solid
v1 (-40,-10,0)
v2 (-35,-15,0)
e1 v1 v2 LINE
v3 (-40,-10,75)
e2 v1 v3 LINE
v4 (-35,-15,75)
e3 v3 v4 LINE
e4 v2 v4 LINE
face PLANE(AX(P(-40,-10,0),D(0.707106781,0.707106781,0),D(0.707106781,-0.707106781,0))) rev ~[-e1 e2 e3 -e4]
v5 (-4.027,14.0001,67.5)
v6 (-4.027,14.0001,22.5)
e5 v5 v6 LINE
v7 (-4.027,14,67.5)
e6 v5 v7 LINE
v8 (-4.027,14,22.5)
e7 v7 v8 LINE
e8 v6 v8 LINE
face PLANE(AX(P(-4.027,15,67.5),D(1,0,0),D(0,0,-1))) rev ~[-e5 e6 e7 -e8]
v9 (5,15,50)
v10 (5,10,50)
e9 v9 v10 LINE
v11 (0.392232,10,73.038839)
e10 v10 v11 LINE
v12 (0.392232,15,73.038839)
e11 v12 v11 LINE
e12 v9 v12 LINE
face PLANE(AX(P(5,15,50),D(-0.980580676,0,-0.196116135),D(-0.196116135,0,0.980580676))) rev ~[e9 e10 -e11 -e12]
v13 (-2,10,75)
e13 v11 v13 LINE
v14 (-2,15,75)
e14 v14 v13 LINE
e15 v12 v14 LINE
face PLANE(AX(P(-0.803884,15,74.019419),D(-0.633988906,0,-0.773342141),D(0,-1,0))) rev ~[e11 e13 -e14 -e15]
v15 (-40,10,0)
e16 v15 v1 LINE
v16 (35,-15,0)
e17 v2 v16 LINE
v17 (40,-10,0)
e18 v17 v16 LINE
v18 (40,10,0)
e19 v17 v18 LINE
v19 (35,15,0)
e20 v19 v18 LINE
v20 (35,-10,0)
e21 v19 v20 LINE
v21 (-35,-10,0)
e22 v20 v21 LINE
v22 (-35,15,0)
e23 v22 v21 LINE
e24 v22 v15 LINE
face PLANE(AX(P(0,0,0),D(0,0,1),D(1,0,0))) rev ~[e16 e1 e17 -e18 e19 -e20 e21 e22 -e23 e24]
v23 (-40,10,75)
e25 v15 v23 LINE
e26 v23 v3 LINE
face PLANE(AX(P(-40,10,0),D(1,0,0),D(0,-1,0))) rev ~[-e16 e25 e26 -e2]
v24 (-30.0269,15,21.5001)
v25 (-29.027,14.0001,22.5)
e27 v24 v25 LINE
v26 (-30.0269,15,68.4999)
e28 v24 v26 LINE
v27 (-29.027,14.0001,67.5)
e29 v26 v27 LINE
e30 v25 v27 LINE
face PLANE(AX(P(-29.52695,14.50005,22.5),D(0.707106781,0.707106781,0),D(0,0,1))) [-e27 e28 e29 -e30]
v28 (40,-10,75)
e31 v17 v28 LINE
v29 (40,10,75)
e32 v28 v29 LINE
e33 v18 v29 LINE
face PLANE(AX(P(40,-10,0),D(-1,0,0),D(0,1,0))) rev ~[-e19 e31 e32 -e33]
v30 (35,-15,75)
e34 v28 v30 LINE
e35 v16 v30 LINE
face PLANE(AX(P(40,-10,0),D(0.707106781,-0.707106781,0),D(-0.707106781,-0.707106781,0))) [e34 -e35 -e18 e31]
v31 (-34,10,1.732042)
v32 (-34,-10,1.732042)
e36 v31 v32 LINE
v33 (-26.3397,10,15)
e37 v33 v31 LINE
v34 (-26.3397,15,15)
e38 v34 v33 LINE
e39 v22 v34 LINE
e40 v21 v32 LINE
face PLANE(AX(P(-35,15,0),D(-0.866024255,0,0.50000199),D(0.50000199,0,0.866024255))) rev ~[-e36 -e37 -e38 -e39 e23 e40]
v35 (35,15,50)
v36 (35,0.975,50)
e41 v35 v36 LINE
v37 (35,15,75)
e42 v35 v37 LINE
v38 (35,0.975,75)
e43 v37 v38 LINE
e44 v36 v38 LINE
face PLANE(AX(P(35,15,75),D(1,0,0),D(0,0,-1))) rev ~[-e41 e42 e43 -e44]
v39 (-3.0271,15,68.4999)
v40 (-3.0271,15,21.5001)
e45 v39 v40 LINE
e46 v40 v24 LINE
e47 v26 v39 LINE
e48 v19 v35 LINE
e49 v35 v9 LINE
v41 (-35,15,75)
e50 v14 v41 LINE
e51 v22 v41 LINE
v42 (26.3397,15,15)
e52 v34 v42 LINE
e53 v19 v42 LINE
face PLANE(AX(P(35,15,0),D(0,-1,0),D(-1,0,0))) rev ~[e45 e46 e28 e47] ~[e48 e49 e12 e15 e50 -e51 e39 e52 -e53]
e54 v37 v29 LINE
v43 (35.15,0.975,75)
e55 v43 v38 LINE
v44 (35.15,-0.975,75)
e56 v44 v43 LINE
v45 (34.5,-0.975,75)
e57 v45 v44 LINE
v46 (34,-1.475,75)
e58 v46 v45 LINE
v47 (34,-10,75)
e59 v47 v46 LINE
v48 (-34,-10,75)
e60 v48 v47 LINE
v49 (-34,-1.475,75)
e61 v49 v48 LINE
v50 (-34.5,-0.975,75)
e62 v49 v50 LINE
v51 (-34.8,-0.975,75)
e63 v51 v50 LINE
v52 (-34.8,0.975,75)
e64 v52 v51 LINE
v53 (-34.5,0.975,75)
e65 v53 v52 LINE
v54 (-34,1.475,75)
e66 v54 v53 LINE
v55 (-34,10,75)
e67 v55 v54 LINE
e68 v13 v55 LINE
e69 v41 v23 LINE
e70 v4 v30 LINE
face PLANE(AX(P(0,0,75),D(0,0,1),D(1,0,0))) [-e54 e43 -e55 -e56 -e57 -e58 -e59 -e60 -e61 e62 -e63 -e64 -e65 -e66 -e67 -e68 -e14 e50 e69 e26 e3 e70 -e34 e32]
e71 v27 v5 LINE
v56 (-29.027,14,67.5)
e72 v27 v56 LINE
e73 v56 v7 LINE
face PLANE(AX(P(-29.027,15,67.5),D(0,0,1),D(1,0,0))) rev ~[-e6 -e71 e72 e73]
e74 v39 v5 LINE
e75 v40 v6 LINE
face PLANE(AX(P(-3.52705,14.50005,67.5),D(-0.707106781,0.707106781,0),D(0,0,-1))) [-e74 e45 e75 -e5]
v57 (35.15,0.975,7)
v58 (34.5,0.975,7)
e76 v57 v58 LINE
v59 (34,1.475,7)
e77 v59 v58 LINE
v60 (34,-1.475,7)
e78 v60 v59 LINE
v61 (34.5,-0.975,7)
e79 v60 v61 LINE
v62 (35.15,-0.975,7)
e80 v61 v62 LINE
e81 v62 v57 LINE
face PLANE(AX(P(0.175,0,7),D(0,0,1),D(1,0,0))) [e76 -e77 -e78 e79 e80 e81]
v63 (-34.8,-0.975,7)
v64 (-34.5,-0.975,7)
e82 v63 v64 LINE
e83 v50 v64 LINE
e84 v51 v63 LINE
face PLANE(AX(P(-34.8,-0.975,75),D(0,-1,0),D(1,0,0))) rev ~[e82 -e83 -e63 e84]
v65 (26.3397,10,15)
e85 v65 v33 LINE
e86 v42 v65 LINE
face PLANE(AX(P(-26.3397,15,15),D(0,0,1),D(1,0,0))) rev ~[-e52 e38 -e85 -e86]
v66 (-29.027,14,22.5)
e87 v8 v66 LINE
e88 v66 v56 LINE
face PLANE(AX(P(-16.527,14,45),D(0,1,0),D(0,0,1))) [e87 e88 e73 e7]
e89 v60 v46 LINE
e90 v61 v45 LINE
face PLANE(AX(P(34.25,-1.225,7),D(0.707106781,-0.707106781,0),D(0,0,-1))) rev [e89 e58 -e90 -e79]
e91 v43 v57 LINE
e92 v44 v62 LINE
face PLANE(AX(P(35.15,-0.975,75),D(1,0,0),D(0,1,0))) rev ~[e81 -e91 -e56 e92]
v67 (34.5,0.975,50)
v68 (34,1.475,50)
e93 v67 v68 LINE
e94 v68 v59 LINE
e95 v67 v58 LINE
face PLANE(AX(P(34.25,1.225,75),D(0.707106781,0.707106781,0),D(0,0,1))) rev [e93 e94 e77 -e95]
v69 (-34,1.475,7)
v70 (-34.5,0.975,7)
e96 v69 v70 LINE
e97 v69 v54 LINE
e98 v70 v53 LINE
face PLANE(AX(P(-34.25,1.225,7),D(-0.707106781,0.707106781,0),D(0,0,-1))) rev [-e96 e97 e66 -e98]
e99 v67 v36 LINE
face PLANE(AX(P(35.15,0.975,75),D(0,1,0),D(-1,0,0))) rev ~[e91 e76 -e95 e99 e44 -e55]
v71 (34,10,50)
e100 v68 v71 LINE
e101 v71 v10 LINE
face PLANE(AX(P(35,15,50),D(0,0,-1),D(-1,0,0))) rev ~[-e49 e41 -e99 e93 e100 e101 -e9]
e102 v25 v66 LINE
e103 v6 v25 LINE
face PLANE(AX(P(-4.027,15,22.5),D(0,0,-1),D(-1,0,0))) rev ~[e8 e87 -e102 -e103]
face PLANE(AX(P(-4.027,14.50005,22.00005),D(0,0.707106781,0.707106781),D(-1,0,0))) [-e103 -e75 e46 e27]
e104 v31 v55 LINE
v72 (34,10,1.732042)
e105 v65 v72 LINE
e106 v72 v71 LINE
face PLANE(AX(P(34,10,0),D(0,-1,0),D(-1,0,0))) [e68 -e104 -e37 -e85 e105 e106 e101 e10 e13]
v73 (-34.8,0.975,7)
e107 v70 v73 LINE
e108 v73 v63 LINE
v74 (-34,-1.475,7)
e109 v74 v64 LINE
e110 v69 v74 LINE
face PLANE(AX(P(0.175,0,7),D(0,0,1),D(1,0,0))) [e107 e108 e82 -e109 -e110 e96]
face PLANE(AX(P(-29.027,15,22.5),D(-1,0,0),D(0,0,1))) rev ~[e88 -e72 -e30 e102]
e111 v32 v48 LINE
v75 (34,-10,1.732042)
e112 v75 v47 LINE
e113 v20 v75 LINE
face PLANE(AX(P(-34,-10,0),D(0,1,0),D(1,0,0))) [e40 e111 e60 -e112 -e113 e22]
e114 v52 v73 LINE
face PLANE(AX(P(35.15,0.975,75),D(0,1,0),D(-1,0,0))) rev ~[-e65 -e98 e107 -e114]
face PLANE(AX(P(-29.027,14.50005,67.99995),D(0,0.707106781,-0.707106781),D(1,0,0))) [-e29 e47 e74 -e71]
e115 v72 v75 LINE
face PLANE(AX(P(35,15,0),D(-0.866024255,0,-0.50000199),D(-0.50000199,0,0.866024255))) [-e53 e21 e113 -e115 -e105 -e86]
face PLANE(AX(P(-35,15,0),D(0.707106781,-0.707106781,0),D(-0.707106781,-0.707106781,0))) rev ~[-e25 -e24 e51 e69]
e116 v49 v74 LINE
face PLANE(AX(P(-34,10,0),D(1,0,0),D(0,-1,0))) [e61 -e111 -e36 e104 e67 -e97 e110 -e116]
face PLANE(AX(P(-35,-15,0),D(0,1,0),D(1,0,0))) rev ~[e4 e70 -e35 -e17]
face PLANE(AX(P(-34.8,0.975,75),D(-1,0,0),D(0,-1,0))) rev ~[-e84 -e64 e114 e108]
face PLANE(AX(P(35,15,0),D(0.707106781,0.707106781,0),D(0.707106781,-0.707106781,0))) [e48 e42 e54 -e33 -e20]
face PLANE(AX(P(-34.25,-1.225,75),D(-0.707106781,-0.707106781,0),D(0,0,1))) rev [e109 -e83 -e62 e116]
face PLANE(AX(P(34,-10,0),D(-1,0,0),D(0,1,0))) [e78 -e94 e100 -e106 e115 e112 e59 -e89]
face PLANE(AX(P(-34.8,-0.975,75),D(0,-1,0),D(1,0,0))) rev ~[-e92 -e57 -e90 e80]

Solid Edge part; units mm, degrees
sketch "Sketch1" plane through (0, 0, 0) normal (0, 0, 1) x (1, 0, 0)
  line L0 (-34, -10) -> (34, -10)
  line L1 (34, -10) -> (34, 10)
  line L2 (34, 10) -> (-34, 10)
  line L3 (-34, 10) -> (-34, -10)
  line L4 (-35, -15) -> (35, -15)
  line L5 (40, -10) -> (35, -15)
  line L6 (40, -10) -> (40, 10)
  line L7 (35, 15) -> (40, 10)
  line L8 (35, 15) -> (-35, 15)
  line L9 (-35, 15) -> (-40, 10)
  line L10 (-40, 10) -> (-40, -10)
  line L11 (-40, -10) -> (-35, -15)
extrude "Protrusion1" add sketch "Sketch1" along normal blind 75
sketch "Sketch2" plane through (0, 0, 75) normal (0, 0, 1) x (1, 0, 0)
  line L0 (-34.8, -0.975) -> (35.15, -0.975)
  line L1 (35.15, -0.975) -> (35.15, 0.975)
  line L2 (35.15, 0.975) -> (-34.8, 0.975)
  line L3 (-34.8, 0.975) -> (-34.8, -0.975)
extrude "Wycięcie_1" cut sketch "Sketch2" against normal blind 68
chamfer "Faza_1" distance 0.5 angle 45 4 edges at (-34, -0.975, 41) (-34, 0.975, 41) (34, -0.975, 41) (34, 0.975, 41)
sketch "Sketch3" plane through (0, 15, 32.5) normal (0, 1, 0) x (-1, 0, 0)
  line L0 (-35, 17.5) -> (-5, 17.5)
  line L1 (-35, 42.5) -> (-35, 17.5)
  line L2 (-35, 42.5) -> (0, 42.5)
  line L3 (-5, 17.5) -> (0, 42.5)
extrude "Cutout1" cut sketch "Sketch3" against normal up to next
sketch "Sketch4" plane through (0, 15, 32.5) normal (0, 1, 0) x (-1, 0, 0)
  line L0 (-35, -32.5) -> (35, -32.5)
  line L1 (35, -32.5) -> (26.3397, -17.5)
  line L2 (26.3397, -17.5) -> (-26.3397, -17.5)
  line L3 (-35, -32.5) -> (-26.3397, -17.5)
extrude "Cutout2" cut sketch "Sketch4" against normal up to vertex (25 mm away)
sketch "Sketch5" plane through (0, 15, 32.5) normal (0, 1, 0) x (0, 0, 1)
  line L0 (-10, -29.027) -> (35, -29.027)
  line L1 (35, -29.027) -> (35, -4.027)
  line L2 (35, -4.027) -> (-10, -4.027)
  line L3 (-10, -4.027) -> (-10, -29.027)
  dimension "D1" = 7.5
  dimension "D2" = 7.5
extrude "Wycięcie_4" cut sketch "Sketch5" against normal blind 1
chamfer "Faza_3" distance 1 angle 45 4 edges at (-4.027, 15, 45) (-16.527, 15, 22.5) (-29.027, 15, 45) (-16.527, 15, 67.5)
chamfer "Chamfer1" [suppressed]
chamfer "Faza_7" [suppressed]
chamfer "Faza_8" distance 2 angle 45 1 edges at (0, 12.5, 75)
